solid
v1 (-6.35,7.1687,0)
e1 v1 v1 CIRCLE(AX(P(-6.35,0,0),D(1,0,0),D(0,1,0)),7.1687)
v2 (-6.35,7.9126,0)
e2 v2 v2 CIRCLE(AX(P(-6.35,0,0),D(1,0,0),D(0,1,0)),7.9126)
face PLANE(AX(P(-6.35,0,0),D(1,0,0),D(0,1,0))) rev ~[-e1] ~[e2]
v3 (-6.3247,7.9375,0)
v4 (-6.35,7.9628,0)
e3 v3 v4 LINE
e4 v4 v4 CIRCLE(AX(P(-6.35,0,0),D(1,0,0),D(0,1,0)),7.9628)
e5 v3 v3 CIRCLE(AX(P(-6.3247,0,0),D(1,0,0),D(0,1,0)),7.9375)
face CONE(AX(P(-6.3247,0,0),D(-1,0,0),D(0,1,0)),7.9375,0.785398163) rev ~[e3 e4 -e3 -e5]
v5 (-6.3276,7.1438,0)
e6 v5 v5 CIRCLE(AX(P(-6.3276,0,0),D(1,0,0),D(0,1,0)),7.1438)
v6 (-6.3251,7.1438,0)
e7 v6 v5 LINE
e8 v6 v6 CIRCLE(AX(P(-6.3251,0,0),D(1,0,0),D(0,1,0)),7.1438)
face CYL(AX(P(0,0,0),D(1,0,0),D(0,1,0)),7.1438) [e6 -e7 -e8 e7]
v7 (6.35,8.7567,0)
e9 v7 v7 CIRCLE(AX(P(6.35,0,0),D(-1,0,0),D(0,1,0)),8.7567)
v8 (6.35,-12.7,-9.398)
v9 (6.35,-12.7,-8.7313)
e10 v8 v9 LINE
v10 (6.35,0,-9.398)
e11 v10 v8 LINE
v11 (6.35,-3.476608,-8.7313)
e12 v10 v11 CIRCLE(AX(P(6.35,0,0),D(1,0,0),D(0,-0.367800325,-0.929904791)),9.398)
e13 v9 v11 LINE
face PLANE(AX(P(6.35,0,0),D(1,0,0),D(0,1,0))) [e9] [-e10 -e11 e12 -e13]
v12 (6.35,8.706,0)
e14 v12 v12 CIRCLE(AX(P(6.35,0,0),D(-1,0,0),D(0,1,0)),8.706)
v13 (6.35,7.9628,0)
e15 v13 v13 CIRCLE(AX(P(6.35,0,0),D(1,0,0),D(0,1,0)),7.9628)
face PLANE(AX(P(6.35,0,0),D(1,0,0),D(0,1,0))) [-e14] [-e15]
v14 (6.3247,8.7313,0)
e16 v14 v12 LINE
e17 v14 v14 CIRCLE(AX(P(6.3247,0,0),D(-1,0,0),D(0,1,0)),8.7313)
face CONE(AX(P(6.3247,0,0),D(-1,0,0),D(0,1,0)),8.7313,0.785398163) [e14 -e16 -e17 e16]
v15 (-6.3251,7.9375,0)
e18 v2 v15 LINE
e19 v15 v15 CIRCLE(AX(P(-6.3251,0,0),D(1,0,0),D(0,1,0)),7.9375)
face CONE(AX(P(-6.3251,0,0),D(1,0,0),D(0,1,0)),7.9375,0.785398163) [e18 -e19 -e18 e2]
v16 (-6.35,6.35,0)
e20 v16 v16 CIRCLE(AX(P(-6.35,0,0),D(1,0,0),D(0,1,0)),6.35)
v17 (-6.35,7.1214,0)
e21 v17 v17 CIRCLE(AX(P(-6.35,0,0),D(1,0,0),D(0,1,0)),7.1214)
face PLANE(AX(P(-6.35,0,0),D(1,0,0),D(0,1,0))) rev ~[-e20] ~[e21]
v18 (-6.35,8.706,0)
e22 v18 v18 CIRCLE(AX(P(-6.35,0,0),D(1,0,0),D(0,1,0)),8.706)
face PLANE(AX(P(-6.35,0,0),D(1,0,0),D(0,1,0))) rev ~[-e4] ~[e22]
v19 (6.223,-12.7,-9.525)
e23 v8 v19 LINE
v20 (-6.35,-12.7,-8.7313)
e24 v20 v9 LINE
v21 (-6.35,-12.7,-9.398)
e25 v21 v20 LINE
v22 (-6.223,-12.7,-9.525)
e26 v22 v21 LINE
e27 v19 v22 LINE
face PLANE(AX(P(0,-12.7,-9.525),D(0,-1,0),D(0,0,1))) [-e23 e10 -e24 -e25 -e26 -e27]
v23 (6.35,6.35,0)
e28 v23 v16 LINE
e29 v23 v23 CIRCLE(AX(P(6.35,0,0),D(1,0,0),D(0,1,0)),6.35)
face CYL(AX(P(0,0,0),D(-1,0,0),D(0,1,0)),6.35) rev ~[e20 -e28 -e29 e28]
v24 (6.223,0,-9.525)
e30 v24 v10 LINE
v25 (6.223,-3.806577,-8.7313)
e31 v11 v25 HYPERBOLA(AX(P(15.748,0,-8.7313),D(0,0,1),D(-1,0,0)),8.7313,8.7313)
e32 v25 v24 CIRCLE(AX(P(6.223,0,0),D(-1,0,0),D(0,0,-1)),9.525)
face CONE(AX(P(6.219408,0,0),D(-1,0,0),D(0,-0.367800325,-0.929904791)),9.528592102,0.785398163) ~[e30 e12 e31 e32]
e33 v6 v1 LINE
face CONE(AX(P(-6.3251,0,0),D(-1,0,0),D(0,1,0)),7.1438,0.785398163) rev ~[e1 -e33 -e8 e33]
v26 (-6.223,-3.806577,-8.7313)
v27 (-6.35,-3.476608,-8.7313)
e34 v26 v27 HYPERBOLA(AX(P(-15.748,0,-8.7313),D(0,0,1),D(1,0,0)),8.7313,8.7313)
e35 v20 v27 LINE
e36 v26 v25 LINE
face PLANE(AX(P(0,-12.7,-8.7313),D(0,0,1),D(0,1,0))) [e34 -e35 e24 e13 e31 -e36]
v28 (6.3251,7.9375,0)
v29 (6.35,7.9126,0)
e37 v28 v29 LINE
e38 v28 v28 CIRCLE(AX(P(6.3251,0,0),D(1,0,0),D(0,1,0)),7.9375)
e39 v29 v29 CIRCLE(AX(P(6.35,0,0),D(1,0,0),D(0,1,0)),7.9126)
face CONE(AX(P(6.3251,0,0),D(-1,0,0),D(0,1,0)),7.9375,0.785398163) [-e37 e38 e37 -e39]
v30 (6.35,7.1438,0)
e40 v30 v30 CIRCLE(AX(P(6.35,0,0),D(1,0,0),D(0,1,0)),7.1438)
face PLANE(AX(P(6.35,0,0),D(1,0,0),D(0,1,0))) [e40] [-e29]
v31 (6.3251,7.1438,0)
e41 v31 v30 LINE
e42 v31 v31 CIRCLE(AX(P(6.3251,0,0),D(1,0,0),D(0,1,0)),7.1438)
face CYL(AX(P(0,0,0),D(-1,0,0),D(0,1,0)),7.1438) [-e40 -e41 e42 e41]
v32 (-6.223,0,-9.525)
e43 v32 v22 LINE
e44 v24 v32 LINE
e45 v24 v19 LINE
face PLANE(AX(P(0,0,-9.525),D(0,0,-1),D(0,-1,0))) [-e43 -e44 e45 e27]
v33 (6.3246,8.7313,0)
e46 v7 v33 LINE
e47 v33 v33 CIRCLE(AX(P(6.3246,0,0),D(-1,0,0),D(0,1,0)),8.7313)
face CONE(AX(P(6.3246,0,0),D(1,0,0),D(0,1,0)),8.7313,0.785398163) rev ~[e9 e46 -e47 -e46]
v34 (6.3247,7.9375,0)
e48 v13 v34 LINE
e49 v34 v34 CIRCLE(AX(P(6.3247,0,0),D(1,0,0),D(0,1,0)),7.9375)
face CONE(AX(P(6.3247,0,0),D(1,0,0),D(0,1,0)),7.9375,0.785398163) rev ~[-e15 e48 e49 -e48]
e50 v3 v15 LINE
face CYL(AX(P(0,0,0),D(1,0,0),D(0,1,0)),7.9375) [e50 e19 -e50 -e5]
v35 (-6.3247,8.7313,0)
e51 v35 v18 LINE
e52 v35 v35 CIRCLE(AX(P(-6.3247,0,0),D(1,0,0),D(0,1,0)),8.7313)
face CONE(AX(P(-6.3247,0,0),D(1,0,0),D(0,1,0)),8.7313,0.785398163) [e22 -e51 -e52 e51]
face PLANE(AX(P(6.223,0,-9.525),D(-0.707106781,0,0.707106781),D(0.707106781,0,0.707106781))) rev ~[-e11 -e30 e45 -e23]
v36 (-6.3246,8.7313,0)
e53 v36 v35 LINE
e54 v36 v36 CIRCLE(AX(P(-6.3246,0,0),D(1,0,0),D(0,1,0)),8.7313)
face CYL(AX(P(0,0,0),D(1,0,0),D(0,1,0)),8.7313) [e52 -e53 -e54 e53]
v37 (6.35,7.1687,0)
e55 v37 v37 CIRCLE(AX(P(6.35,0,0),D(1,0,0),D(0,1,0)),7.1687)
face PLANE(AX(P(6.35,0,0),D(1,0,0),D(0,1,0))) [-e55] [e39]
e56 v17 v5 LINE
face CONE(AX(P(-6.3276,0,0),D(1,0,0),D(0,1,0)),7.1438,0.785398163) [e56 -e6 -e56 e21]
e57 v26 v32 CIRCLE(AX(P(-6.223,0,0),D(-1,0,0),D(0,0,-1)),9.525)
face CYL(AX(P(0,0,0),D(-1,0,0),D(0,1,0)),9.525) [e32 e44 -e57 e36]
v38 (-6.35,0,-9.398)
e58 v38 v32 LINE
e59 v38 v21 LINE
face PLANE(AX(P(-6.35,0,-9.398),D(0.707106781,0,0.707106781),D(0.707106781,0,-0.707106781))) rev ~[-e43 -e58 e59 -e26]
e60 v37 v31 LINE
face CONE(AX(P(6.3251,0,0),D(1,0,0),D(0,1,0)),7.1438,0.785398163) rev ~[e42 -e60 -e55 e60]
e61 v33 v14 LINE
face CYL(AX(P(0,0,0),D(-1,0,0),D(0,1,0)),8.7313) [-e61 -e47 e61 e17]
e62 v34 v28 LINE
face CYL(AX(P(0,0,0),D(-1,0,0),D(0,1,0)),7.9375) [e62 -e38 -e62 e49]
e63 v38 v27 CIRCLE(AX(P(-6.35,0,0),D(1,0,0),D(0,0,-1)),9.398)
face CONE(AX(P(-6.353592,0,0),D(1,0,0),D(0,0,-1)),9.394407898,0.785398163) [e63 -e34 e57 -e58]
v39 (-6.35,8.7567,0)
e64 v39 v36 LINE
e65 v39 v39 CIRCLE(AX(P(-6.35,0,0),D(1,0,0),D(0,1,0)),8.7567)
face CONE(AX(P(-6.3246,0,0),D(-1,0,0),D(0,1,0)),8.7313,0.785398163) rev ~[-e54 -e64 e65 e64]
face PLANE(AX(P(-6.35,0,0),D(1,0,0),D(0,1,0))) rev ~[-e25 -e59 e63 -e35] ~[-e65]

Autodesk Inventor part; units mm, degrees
ref_plane "YZ Plane" through (0, 0, 0) normal (1, 0, 0) x (0, 1, 0)
ref_plane "XZ Plane" through (0, 0, 0) normal (0, 1, 0) x (-1, 0, 0)
ref_plane "XY Plane" through (0, 0, 0) normal (0, 0, 1) x (1, 0, 0)
sketch "Sketch1" plane through (0, 0, 0) normal (1, 0, 0) x (0, 1, 0)
  circle A0 centre (0, 0) radius 9.525
  circle A1 centre (0, 0) radius 8.7313
  line L0 (0, -9.525) -> (-12.7, -9.525)
  line L1 (-12.7, -9.525) -> (-12.7, -8.7313)
  line L2 (-12.7, -8.7313) -> (0, -8.7313)
  circle A2 centre (0, 0) radius 7.9375
  circle A3 centre (0, 0) radius 7.1438
  circle A4 centre (0, 0) radius 6.35
  point P0 (-3.8067, -8.7313)
  dimension "d13" = 19.05
  dimension "d0" = 0.7937
  dimension "d2" = 12.7
  dimension "d15" = 0.7937
  dimension "d16" = 0.7937
  dimension "d17" = 0.7937
extrude "Extrusion1" add sketch "Sketch1" along normal mid plane 12.7 contours A0 | L0 L1 L2 A0
chamfer "Chamfer2" distance 0.0254 angle 45 2 edges at (6.35, -8.7313, 0) (-6.35, -8.7313, 0)
extrude "Extrusion2" add sketch "Sketch1" along normal mid plane 12.7 contours A1
chamfer "Chamfer3" distance 0.0254 angle 45 4 edges at (-6.35, -8.7313, 0) (-6.35, -7.9375, 0) (6.35, -7.9375, 0) (6.35, -8.7313, 0)
extrude "Extrusion3" add sketch "Sketch1" along normal mid plane 12.7 contours A2
chamfer "Chamfer4" distance 0.0254 angle 45 4 edges at (-6.35, -7.9375, 0) (-6.35, -7.1438, 0) (6.35, -7.1438, 0) (6.35, -7.9375, 0)
extrude "Extrusion4" add sketch "Sketch1" along normal mid plane 12.7 contours A3
chamfer "Chamfer5" distance 0.0254 angle 45 1 edges at (-6.35, -7.1438, 0)
chamfer "Chamfer6" distance 0.127 angle 45 4 edges at (6.35, 1.9443, 9.3245) (6.35, -6.35, -9.525) (-6.35, 1.9443, 9.3245) (-6.35, -6.35, -9.525)
equation "\"d16\" = d15"
equation "\"d18\" = d3"
equation "\"d22\" = d8"
equation "\"d20\" = d3"
equation "\"d25\" = d8"
equation "\"d28\" = d3"
equation "\"d30\" = d8"
equation "\"d3\" = 12.7"
equation "\"d8\" = 0.0254"
properties part number "GreyT Constant Force Spring" material "Steel"
